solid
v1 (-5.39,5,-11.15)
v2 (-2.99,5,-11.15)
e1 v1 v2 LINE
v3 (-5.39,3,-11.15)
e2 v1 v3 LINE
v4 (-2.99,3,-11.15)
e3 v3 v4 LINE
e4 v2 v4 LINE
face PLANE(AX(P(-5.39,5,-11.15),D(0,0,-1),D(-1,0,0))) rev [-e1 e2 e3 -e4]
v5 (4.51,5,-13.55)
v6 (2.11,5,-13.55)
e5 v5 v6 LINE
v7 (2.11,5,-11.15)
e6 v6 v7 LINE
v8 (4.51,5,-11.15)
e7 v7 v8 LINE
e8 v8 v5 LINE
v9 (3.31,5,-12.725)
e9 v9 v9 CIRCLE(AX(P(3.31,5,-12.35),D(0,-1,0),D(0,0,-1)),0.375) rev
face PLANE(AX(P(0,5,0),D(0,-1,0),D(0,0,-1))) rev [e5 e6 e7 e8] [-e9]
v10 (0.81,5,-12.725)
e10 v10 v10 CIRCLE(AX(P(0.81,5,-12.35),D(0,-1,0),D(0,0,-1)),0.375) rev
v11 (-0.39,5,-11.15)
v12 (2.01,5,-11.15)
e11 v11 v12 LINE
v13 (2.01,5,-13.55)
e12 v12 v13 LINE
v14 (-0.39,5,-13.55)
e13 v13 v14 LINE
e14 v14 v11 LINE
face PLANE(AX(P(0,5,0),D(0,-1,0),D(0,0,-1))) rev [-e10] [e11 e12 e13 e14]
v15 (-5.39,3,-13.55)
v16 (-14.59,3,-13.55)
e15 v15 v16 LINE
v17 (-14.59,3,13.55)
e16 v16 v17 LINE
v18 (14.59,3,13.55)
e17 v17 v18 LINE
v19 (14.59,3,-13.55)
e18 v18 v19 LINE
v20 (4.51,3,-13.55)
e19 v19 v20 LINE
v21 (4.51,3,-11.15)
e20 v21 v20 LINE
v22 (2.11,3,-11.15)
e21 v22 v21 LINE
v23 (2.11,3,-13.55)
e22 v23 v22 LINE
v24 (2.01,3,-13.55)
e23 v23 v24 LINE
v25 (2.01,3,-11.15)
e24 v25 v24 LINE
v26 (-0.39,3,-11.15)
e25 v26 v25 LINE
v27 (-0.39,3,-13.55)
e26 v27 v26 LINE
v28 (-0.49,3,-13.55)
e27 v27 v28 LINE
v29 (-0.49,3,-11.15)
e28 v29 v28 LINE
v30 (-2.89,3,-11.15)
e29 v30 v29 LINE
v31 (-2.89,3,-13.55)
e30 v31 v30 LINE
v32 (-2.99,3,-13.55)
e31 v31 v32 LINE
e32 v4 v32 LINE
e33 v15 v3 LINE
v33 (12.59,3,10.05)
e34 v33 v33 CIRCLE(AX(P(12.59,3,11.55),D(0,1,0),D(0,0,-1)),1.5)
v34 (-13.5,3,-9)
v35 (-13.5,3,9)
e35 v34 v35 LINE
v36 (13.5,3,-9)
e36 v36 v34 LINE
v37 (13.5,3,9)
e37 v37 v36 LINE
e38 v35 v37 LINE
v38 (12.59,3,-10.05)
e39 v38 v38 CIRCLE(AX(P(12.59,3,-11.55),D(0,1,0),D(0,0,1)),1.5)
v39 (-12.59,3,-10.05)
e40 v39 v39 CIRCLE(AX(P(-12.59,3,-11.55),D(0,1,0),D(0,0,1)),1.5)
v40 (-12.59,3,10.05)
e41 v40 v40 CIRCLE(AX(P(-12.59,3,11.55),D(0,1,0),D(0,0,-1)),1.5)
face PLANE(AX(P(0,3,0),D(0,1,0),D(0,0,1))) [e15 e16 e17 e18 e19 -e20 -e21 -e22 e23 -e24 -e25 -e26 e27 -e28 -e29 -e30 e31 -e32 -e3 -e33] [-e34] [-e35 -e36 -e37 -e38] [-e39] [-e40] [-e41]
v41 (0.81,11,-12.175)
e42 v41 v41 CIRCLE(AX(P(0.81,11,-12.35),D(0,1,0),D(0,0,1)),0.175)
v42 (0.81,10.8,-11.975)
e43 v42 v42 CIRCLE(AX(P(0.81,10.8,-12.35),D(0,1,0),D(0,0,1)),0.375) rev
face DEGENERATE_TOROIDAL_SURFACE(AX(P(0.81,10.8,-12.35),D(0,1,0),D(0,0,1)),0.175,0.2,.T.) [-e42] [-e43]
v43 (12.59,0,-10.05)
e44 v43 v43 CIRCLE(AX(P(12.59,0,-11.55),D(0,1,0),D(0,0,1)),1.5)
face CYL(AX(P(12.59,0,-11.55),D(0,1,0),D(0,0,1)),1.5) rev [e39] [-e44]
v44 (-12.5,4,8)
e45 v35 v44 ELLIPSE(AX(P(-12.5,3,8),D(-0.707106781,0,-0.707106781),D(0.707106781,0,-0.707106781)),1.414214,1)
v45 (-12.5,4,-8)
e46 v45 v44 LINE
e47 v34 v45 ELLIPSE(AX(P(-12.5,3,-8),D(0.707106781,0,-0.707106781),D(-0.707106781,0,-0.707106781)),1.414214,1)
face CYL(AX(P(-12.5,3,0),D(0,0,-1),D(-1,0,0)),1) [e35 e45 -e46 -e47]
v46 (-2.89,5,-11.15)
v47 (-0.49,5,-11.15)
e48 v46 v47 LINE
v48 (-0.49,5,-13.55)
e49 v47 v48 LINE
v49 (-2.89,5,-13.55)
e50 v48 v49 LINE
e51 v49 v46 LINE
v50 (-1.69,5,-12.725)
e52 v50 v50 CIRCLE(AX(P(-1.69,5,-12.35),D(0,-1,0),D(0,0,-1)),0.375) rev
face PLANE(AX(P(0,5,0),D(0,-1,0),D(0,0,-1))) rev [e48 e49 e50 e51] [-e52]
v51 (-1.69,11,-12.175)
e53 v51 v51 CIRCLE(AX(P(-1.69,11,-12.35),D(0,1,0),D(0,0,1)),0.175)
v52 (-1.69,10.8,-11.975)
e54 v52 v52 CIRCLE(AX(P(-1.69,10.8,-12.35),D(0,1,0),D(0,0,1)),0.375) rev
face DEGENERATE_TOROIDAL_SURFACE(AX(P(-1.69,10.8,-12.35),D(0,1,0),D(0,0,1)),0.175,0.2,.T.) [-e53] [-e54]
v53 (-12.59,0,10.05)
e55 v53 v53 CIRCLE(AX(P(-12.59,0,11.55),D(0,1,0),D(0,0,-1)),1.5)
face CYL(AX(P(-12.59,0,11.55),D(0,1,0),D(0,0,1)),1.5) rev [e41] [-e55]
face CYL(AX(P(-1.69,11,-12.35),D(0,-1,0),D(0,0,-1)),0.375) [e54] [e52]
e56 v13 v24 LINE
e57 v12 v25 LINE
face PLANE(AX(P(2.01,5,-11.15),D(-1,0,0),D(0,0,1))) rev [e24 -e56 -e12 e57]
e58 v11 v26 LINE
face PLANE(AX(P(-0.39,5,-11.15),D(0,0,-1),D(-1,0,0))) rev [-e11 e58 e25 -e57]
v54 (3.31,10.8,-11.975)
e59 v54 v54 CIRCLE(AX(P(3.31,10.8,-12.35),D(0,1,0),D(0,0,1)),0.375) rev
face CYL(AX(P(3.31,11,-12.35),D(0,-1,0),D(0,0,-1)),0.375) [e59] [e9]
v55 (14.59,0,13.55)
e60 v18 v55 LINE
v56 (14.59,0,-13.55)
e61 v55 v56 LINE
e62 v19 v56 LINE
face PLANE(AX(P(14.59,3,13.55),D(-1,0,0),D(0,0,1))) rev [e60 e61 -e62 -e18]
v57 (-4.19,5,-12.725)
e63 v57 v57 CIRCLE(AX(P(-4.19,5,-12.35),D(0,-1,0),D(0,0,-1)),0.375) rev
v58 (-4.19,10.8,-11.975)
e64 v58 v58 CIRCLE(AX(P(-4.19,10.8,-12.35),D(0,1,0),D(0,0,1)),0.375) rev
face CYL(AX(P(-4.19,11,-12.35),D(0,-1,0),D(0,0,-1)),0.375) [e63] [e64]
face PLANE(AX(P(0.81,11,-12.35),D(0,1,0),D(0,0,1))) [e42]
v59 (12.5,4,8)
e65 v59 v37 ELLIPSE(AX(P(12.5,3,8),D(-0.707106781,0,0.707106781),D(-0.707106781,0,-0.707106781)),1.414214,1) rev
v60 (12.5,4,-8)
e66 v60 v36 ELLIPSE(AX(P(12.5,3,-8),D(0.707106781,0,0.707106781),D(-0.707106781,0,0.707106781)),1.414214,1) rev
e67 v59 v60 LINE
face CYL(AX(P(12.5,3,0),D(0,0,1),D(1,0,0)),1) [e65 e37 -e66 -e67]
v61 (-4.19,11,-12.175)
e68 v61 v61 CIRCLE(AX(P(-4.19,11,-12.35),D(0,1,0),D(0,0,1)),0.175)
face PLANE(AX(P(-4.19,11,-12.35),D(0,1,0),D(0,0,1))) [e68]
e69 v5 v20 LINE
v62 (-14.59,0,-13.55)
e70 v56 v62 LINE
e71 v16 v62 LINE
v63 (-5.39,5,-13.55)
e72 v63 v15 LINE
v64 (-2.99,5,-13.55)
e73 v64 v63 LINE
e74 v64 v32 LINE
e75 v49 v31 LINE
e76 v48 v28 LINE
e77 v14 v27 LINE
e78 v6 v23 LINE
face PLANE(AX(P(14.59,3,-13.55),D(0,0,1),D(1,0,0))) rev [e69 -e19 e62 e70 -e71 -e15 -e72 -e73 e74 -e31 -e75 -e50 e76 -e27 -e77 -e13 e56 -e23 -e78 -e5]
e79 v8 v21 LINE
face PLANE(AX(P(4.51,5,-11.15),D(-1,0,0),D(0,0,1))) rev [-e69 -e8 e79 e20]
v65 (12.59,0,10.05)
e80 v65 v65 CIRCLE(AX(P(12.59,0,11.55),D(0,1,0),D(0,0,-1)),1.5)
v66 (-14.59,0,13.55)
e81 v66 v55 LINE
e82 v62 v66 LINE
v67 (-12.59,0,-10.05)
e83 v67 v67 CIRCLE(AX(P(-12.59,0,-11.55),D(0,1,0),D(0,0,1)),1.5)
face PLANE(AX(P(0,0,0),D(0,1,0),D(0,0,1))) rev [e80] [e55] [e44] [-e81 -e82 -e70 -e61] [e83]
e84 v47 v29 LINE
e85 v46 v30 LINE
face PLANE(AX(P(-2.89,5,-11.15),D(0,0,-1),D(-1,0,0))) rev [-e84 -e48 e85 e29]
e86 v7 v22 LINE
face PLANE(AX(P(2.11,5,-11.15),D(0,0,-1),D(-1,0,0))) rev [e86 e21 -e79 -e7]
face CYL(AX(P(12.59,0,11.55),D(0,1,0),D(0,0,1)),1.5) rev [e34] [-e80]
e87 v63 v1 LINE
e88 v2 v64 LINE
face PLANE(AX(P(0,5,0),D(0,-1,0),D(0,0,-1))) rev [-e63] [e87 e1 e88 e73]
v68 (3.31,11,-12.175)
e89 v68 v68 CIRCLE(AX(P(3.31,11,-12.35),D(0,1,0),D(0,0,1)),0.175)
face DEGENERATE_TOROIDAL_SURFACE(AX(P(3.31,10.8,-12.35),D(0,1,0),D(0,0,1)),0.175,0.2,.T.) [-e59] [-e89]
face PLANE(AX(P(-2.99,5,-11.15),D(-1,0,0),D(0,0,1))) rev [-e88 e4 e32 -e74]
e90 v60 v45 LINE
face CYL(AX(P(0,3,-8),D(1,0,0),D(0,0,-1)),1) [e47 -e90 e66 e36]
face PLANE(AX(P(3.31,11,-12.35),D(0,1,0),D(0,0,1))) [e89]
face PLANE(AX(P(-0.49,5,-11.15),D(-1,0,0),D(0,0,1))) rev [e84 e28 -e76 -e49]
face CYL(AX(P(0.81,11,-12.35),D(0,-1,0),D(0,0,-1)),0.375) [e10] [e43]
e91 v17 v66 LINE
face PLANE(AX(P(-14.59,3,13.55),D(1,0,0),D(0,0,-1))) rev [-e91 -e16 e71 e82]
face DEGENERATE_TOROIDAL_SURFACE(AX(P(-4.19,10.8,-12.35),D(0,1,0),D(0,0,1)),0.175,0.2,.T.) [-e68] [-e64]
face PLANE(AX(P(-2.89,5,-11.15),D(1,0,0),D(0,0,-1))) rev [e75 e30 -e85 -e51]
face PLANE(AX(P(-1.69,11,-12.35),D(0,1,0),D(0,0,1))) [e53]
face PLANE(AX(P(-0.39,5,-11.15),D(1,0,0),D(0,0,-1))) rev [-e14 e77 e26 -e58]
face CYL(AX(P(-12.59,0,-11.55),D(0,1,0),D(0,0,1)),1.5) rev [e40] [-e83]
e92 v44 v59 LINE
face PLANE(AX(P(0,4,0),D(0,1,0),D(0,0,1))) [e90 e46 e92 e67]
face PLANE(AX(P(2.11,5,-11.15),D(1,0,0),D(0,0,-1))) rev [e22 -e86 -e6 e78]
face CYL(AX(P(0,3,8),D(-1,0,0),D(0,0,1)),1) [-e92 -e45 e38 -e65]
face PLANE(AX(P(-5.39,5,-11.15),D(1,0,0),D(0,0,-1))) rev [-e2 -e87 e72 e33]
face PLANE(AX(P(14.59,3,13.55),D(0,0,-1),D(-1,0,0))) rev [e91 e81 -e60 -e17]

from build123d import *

# Parameters (mm, degrees)
SKETCH1_W           = 29.18
SKETCH1_H           = 27.1
BOSS_EXTRUDE1_DEPTH = 3
SKETCH2_W           = 27
SKETCH2_H           = 18
BOSS_EXTRUDE2_DEPTH = 1
FILLET1_R           = 1
SKETCH3_R           = 1.5
CUT_EXTRUDE1_DEPTH  = 21.136300554
SKETCH4_W           = 2.4
SKETCH4_H           = 2.4
BOSS_EXTRUDE3_DEPTH = 2
SKETCH5_R           = 0.375
BOSS_EXTRUDE4_DEPTH = 6
FILLET2_R           = 0.2


with BuildPart() as part:
    # Sketch1 → Boss-Extrude1 (new body)
    with BuildSketch(Plane(origin=(0, 0, 0), x_dir=(1, 0, 0), z_dir=(0, 1, 0))):
        Rectangle(SKETCH1_W, SKETCH1_H)
    extrude(amount=BOSS_EXTRUDE1_DEPTH)

    # Sketch2 → Boss-Extrude2 (add)
    with BuildSketch(Plane(origin=(0, 3, 0), x_dir=(1, 0, 0), z_dir=(0, 1, 0))):
        Rectangle(SKETCH2_W, SKETCH2_H)
    extrude(amount=BOSS_EXTRUDE2_DEPTH)

    # Fillet1
    fillet1_edges = [part.edges().sort_by_distance(p)[0] for p in [
        (0, 4, -9),
        (13.5, 4, 0),
        (0, 4, 9),
        (-13.5, 4, 0),
    ]]
    fillet(fillet1_edges, radius=FILLET1_R - 0.0001)  # a hair under: the kernel refuses the full size

    # Sketch3 → Cut-Extrude1 (cut, through all)
    with BuildSketch(Plane(origin=(0, 3, 0), x_dir=(1, 0, 0), z_dir=(0, 1, 0))):
        with Locations(Location((-12.59, 11.55, 0), (0, 0, 270))):
            Circle(SKETCH3_R)
        with Locations(Location((12.59, 11.55, 0), (0, 0, 270))):
            Circle(SKETCH3_R)
        with Locations(Location((12.59, -11.55, 0), (0, 0, 90))):
            Circle(SKETCH3_R)
        with Locations(Location((-12.59, -11.55, 0), (0, 0, 90))):
            Circle(SKETCH3_R)
    extrude(amount=-CUT_EXTRUDE1_DEPTH, mode=Mode.SUBTRACT)

    # Sketch4 → Boss-Extrude3 (add)
    with BuildSketch(Plane(origin=(0, 3, 0), x_dir=(1, 0, 0), z_dir=(0, 1, 0))):
        with Locations((-4.19, 12.35)):
            Rectangle(SKETCH4_W, SKETCH4_H)
        with Locations((-1.69, 12.35)):
            Rectangle(SKETCH4_W, SKETCH4_H)
        with Locations((0.81, 12.35)):
            Rectangle(SKETCH4_W, SKETCH4_H)
        with Locations((3.31, 12.35)):
            Rectangle(SKETCH4_W, SKETCH4_H)
    extrude(amount=BOSS_EXTRUDE3_DEPTH)

    # Sketch5 → Boss-Extrude4 (add)
    with BuildSketch(Plane(origin=(0, 5, 0), x_dir=(1, 0, 0), z_dir=(0, 1, 0))):
        with Locations(Location((-4.19, 12.35, 0), (0, 0, 90))):
            Circle(SKETCH5_R)
        with Locations(Location((-1.69, 12.35, 0), (0, 0, 90))):
            Circle(SKETCH5_R)
        with Locations(Location((0.81, 12.35, 0), (0, 0, 90))):
            Circle(SKETCH5_R)
        with Locations(Location((3.31, 12.35, 0), (0, 0, 90))):
            Circle(SKETCH5_R)
    extrude(amount=BOSS_EXTRUDE4_DEPTH)

    # Fillet2
    fillet2_edges = [part.edges().sort_by_distance(p)[0] for p in [
        (-4.19, 11, -11.975),
        (-1.69, 11, -11.975),
        (0.81, 11, -11.975),
        (3.31, 11, -11.975),
    ]]
    fillet(fillet2_edges, radius=FILLET2_R)


solid = part.part
